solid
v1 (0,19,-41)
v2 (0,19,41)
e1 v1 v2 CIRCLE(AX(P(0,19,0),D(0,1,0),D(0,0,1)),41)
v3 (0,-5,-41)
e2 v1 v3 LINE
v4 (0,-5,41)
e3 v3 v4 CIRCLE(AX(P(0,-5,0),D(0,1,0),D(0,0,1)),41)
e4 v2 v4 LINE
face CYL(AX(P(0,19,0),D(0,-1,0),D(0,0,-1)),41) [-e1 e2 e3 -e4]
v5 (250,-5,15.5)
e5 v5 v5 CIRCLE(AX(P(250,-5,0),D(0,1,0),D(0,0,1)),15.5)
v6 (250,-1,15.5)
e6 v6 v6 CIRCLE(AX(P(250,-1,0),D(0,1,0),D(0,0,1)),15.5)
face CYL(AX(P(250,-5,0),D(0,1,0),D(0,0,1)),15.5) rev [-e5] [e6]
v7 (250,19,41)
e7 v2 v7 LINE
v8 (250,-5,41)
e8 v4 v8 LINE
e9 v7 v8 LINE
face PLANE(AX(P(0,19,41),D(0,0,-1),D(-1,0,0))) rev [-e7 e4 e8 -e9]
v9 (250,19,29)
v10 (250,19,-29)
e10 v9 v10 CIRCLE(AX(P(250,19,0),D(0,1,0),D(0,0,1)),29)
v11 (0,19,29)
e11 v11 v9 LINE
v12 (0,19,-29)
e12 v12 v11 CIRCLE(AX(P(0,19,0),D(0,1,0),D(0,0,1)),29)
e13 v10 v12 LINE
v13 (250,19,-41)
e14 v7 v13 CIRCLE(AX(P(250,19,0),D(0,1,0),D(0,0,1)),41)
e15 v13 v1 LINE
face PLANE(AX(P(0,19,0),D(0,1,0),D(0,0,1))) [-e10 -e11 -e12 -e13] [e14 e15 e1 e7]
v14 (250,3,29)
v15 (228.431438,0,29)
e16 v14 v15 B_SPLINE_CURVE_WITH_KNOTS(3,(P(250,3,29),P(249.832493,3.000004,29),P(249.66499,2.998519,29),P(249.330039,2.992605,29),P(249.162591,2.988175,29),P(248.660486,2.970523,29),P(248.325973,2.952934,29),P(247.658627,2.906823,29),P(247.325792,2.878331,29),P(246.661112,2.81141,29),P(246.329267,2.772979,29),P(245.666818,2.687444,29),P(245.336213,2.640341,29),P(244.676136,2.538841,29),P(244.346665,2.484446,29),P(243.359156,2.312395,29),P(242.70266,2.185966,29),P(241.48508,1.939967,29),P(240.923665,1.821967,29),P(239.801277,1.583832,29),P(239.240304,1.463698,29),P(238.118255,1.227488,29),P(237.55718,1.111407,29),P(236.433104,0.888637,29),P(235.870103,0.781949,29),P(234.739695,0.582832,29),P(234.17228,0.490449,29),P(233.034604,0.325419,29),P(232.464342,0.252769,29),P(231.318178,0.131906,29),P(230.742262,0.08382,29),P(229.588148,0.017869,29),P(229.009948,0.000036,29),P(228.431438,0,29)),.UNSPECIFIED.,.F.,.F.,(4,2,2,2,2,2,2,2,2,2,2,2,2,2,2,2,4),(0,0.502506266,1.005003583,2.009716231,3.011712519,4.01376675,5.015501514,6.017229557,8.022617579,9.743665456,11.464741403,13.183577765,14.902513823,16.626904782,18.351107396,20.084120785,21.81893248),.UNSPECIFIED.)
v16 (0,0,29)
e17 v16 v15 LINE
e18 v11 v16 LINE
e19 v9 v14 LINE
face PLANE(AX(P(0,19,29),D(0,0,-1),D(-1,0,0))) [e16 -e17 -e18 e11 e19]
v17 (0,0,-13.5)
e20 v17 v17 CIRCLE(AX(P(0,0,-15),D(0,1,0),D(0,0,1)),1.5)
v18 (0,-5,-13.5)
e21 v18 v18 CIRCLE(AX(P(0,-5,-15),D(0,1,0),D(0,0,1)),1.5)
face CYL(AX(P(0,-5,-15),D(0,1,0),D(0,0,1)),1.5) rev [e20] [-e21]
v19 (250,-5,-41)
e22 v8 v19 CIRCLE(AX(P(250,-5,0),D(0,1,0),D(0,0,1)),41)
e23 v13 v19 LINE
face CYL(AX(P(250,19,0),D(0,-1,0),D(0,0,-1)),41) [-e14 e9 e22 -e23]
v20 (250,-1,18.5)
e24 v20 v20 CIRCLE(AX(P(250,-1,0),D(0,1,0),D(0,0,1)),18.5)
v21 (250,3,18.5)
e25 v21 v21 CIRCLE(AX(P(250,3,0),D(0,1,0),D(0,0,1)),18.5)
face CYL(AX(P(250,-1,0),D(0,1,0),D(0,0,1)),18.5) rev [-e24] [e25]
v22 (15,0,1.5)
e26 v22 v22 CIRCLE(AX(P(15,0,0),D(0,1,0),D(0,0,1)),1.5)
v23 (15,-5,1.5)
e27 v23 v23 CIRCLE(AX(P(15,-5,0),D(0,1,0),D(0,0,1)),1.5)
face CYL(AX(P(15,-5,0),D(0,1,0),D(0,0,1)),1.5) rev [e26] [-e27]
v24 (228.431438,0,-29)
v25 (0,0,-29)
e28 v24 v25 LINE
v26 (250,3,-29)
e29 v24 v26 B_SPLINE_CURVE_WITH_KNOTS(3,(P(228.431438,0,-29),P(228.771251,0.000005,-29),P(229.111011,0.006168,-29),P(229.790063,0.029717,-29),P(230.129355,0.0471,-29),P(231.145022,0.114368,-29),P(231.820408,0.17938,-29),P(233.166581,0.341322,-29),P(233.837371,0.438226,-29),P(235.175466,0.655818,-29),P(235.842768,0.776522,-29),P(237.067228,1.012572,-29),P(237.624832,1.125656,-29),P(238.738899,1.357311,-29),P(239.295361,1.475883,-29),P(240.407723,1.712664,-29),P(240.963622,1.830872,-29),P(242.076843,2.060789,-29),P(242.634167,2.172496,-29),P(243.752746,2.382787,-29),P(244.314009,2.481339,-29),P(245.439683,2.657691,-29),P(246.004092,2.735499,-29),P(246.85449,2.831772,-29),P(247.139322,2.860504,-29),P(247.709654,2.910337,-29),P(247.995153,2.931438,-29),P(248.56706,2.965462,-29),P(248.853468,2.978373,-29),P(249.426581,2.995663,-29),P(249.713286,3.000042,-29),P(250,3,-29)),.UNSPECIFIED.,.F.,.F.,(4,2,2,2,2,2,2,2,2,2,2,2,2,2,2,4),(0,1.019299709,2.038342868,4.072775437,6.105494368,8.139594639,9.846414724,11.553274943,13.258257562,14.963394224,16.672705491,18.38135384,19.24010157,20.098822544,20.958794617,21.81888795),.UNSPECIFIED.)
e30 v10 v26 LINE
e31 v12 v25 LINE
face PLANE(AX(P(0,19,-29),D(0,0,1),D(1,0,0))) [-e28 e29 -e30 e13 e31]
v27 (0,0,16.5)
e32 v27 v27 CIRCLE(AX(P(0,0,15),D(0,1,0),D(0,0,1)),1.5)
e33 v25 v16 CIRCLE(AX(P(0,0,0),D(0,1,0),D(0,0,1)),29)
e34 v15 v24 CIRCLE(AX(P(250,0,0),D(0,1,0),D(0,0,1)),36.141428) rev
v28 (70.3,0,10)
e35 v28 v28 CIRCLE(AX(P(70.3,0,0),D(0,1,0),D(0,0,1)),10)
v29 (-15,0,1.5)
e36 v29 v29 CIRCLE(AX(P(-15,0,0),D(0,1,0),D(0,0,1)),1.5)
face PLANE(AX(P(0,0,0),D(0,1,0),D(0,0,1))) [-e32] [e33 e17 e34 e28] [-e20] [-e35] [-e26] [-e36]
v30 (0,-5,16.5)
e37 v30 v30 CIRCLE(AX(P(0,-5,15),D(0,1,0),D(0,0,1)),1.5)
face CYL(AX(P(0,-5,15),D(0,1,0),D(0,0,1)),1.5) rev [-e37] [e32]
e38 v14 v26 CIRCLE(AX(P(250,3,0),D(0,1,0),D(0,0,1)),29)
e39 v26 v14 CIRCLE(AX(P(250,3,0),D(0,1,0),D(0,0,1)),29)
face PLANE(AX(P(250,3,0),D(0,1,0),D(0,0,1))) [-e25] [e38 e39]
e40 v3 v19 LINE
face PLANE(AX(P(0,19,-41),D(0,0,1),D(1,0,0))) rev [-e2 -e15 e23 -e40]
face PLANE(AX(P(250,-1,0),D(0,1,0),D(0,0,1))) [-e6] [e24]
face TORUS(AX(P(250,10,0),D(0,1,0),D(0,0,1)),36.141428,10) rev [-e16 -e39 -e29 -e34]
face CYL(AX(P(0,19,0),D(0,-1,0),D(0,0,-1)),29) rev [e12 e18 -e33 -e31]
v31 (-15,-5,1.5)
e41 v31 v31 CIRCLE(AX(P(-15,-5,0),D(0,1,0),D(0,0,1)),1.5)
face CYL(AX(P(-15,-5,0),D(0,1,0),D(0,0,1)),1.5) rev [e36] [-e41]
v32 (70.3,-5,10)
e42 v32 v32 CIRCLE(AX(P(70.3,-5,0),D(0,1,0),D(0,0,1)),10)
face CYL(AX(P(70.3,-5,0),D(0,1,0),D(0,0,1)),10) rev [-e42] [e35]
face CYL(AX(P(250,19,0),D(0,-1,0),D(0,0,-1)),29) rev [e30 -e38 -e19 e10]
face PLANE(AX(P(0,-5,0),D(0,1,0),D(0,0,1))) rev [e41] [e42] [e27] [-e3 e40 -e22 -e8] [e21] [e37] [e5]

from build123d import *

# Parameters (mm, degrees)
BOSS_EXTRUDE1_DEPTH     = 19
BOSS_EXTRUDE2_START     = -5
BOSS_EXTRUDE2_DEPTH     = 5
CUT_EXTRUDE1_DEPTH      = 295.487690744
CUT_EXTRUDE1_DEPTH_BACK = 295.487690744
SKETCH3_R               = 1.5
SKETCH4_R               = 29
BOSS_EXTRUDE3_DEPTH     = 3
SKETCH5_R               = 18.5
CUT_EXTRUDE2_DEPTH      = 4
CUT_EXTRUDE3_DEPTH      = 295.553899991
CUT_EXTRUDE3_DEPTH_BACK = 295.553899991
SKETCH6_R               = 15.5
FILLET1_R               = 10
CUT_EXTRUDE4_DEPTH      = 295.487690751
CUT_EXTRUDE4_DEPTH_BACK = 295.487690751
SKETCH7_R               = 10


with BuildPart() as part:
    # Sketch1 → Boss-Extrude1 (new body)
    with BuildSketch(Plane(origin=(0, 0, 0), x_dir=(1, 0, 0), z_dir=(0, 1, 0))):
        with BuildLine():
            Line((0, -41), (250, -41))
            ThreePointArc((250, -41), (291, 0), (250, 41))
            Line((250, 41), (0, 41))
            ThreePointArc((0, 41), (-41, 0), (0, -41))
        make_face()
        with BuildLine():
            Line((0, 29), (250, 29))
            ThreePointArc((250, 29), (279, 0), (250, -29))
            Line((250, -29), (0, -29))
            ThreePointArc((0, -29), (-29, 0), (0, 29))
        make_face(mode=Mode.SUBTRACT)
    extrude(amount=BOSS_EXTRUDE1_DEPTH)

    # Sketch1<2> → Boss-Extrude2 (add)
    with BuildSketch(Plane(origin=(0, 0, 0), x_dir=(1, 0, 0), z_dir=(0, 1, 0)).offset(BOSS_EXTRUDE2_START)):
        with BuildLine():
            ThreePointArc((0, 41), (-41, 0), (0, -41))
            Line((0, -41), (250, -41))
            ThreePointArc((250, -41), (291, 0), (250, 41))
            Line((250, 41), (0, 41))
        make_face()
    extrude(amount=BOSS_EXTRUDE2_DEPTH)

    # Sketch3 → Cut-Extrude1 (cut, two sides: drawn at the far end of the back side and taken through both)
    with BuildSketch(Plane(origin=(0, 0, 0), x_dir=(1, 0, 0), z_dir=(0, 1, 0)).offset(-CUT_EXTRUDE1_DEPTH_BACK)):
        with Locations(Location((0, 15, 0), (0, 0, 270))):
            Circle(SKETCH3_R)
        with Locations(Location((15, 0, 0), (0, 0, 270))):
            Circle(SKETCH3_R)
        with Locations(Location((0, -15, 0), (0, 0, 270))):
            Circle(SKETCH3_R)
        with Locations(Location((-15, 0, 0), (0, 0, 270))):
            Circle(SKETCH3_R)
    extrude(amount=CUT_EXTRUDE1_DEPTH + CUT_EXTRUDE1_DEPTH_BACK, mode=Mode.SUBTRACT)

    # Sketch4 → Boss-Extrude3 (add)
    with BuildSketch(Plane(origin=(0, 0, 0), x_dir=(1, 0, 0), z_dir=(0, 1, 0))):
        with Locations((250, 0)):
            Circle(SKETCH4_R)
    extrude(amount=BOSS_EXTRUDE3_DEPTH)

    # Sketch5 → Cut-Extrude2 (cut)
    with BuildSketch(Plane(origin=(0, 3, 0), x_dir=(1, 0, 0), z_dir=(0, 1, 0))):
        with Locations(Location((250, 0, 0), (0, 0, 270))):
            Circle(SKETCH5_R)
    extrude(amount=-CUT_EXTRUDE2_DEPTH, mode=Mode.SUBTRACT)

    # Sketch6 → Cut-Extrude3 (cut, two sides: drawn at the far end of the back side and taken through both)
    with BuildSketch(Plane(origin=(0, -1, 0), x_dir=(1, 0, 0), z_dir=(0, 1, 0)).offset(-CUT_EXTRUDE3_DEPTH_BACK)):
        with Locations(Location((250, 0, 0), (0, 0, 270))):
            Circle(SKETCH6_R)
    extrude(amount=CUT_EXTRUDE3_DEPTH + CUT_EXTRUDE3_DEPTH_BACK, mode=Mode.SUBTRACT)

    # Fillet1
    # the kernel refuses this fillet: 10 mm, written as the material it adds along each edge
    with BuildSketch(Plane(origin=(250, 0, 0), x_dir=(0.5782894613752282, 0, -0.8158316608604672), z_dir=(0.8158316608604672, 0, 0.5782894613752282))) as fillet1_piece_1:
        with BuildLine():
            CenterArc((36.141428429, 10), FILLET1_R, 224.427004001, 45.572995999)
            Line((36.141428429, 0), (36.141428429, -0.2))
            Line((36.141428429, -0.2), (29, -0.2))
            Line((29, -0.2), (28.8, 0))
            ThreePointArc((28.8, 0), (28.8, 1.5), (28.857171431, 2.86))
            Line((28.857171431, 2.86), (29, 3))
        make_face()
    revolve(axis=Axis((250, 0, 0), (0, 1, 0)), revolution_arc=250.660644369)

    # Sketch7 → Cut-Extrude4 (cut, two sides: drawn at the far end of the back side and taken through both)
    with BuildSketch(Plane(origin=(0, 0, 0), x_dir=(1, 0, 0), z_dir=(0, 1, 0)).offset(-CUT_EXTRUDE4_DEPTH_BACK)):
        with Locations(Location((70.3, 0, 0), (0, 0, 270))):
            Circle(SKETCH7_R)
    extrude(amount=CUT_EXTRUDE4_DEPTH + CUT_EXTRUDE4_DEPTH_BACK, mode=Mode.SUBTRACT)


solid = part.part
